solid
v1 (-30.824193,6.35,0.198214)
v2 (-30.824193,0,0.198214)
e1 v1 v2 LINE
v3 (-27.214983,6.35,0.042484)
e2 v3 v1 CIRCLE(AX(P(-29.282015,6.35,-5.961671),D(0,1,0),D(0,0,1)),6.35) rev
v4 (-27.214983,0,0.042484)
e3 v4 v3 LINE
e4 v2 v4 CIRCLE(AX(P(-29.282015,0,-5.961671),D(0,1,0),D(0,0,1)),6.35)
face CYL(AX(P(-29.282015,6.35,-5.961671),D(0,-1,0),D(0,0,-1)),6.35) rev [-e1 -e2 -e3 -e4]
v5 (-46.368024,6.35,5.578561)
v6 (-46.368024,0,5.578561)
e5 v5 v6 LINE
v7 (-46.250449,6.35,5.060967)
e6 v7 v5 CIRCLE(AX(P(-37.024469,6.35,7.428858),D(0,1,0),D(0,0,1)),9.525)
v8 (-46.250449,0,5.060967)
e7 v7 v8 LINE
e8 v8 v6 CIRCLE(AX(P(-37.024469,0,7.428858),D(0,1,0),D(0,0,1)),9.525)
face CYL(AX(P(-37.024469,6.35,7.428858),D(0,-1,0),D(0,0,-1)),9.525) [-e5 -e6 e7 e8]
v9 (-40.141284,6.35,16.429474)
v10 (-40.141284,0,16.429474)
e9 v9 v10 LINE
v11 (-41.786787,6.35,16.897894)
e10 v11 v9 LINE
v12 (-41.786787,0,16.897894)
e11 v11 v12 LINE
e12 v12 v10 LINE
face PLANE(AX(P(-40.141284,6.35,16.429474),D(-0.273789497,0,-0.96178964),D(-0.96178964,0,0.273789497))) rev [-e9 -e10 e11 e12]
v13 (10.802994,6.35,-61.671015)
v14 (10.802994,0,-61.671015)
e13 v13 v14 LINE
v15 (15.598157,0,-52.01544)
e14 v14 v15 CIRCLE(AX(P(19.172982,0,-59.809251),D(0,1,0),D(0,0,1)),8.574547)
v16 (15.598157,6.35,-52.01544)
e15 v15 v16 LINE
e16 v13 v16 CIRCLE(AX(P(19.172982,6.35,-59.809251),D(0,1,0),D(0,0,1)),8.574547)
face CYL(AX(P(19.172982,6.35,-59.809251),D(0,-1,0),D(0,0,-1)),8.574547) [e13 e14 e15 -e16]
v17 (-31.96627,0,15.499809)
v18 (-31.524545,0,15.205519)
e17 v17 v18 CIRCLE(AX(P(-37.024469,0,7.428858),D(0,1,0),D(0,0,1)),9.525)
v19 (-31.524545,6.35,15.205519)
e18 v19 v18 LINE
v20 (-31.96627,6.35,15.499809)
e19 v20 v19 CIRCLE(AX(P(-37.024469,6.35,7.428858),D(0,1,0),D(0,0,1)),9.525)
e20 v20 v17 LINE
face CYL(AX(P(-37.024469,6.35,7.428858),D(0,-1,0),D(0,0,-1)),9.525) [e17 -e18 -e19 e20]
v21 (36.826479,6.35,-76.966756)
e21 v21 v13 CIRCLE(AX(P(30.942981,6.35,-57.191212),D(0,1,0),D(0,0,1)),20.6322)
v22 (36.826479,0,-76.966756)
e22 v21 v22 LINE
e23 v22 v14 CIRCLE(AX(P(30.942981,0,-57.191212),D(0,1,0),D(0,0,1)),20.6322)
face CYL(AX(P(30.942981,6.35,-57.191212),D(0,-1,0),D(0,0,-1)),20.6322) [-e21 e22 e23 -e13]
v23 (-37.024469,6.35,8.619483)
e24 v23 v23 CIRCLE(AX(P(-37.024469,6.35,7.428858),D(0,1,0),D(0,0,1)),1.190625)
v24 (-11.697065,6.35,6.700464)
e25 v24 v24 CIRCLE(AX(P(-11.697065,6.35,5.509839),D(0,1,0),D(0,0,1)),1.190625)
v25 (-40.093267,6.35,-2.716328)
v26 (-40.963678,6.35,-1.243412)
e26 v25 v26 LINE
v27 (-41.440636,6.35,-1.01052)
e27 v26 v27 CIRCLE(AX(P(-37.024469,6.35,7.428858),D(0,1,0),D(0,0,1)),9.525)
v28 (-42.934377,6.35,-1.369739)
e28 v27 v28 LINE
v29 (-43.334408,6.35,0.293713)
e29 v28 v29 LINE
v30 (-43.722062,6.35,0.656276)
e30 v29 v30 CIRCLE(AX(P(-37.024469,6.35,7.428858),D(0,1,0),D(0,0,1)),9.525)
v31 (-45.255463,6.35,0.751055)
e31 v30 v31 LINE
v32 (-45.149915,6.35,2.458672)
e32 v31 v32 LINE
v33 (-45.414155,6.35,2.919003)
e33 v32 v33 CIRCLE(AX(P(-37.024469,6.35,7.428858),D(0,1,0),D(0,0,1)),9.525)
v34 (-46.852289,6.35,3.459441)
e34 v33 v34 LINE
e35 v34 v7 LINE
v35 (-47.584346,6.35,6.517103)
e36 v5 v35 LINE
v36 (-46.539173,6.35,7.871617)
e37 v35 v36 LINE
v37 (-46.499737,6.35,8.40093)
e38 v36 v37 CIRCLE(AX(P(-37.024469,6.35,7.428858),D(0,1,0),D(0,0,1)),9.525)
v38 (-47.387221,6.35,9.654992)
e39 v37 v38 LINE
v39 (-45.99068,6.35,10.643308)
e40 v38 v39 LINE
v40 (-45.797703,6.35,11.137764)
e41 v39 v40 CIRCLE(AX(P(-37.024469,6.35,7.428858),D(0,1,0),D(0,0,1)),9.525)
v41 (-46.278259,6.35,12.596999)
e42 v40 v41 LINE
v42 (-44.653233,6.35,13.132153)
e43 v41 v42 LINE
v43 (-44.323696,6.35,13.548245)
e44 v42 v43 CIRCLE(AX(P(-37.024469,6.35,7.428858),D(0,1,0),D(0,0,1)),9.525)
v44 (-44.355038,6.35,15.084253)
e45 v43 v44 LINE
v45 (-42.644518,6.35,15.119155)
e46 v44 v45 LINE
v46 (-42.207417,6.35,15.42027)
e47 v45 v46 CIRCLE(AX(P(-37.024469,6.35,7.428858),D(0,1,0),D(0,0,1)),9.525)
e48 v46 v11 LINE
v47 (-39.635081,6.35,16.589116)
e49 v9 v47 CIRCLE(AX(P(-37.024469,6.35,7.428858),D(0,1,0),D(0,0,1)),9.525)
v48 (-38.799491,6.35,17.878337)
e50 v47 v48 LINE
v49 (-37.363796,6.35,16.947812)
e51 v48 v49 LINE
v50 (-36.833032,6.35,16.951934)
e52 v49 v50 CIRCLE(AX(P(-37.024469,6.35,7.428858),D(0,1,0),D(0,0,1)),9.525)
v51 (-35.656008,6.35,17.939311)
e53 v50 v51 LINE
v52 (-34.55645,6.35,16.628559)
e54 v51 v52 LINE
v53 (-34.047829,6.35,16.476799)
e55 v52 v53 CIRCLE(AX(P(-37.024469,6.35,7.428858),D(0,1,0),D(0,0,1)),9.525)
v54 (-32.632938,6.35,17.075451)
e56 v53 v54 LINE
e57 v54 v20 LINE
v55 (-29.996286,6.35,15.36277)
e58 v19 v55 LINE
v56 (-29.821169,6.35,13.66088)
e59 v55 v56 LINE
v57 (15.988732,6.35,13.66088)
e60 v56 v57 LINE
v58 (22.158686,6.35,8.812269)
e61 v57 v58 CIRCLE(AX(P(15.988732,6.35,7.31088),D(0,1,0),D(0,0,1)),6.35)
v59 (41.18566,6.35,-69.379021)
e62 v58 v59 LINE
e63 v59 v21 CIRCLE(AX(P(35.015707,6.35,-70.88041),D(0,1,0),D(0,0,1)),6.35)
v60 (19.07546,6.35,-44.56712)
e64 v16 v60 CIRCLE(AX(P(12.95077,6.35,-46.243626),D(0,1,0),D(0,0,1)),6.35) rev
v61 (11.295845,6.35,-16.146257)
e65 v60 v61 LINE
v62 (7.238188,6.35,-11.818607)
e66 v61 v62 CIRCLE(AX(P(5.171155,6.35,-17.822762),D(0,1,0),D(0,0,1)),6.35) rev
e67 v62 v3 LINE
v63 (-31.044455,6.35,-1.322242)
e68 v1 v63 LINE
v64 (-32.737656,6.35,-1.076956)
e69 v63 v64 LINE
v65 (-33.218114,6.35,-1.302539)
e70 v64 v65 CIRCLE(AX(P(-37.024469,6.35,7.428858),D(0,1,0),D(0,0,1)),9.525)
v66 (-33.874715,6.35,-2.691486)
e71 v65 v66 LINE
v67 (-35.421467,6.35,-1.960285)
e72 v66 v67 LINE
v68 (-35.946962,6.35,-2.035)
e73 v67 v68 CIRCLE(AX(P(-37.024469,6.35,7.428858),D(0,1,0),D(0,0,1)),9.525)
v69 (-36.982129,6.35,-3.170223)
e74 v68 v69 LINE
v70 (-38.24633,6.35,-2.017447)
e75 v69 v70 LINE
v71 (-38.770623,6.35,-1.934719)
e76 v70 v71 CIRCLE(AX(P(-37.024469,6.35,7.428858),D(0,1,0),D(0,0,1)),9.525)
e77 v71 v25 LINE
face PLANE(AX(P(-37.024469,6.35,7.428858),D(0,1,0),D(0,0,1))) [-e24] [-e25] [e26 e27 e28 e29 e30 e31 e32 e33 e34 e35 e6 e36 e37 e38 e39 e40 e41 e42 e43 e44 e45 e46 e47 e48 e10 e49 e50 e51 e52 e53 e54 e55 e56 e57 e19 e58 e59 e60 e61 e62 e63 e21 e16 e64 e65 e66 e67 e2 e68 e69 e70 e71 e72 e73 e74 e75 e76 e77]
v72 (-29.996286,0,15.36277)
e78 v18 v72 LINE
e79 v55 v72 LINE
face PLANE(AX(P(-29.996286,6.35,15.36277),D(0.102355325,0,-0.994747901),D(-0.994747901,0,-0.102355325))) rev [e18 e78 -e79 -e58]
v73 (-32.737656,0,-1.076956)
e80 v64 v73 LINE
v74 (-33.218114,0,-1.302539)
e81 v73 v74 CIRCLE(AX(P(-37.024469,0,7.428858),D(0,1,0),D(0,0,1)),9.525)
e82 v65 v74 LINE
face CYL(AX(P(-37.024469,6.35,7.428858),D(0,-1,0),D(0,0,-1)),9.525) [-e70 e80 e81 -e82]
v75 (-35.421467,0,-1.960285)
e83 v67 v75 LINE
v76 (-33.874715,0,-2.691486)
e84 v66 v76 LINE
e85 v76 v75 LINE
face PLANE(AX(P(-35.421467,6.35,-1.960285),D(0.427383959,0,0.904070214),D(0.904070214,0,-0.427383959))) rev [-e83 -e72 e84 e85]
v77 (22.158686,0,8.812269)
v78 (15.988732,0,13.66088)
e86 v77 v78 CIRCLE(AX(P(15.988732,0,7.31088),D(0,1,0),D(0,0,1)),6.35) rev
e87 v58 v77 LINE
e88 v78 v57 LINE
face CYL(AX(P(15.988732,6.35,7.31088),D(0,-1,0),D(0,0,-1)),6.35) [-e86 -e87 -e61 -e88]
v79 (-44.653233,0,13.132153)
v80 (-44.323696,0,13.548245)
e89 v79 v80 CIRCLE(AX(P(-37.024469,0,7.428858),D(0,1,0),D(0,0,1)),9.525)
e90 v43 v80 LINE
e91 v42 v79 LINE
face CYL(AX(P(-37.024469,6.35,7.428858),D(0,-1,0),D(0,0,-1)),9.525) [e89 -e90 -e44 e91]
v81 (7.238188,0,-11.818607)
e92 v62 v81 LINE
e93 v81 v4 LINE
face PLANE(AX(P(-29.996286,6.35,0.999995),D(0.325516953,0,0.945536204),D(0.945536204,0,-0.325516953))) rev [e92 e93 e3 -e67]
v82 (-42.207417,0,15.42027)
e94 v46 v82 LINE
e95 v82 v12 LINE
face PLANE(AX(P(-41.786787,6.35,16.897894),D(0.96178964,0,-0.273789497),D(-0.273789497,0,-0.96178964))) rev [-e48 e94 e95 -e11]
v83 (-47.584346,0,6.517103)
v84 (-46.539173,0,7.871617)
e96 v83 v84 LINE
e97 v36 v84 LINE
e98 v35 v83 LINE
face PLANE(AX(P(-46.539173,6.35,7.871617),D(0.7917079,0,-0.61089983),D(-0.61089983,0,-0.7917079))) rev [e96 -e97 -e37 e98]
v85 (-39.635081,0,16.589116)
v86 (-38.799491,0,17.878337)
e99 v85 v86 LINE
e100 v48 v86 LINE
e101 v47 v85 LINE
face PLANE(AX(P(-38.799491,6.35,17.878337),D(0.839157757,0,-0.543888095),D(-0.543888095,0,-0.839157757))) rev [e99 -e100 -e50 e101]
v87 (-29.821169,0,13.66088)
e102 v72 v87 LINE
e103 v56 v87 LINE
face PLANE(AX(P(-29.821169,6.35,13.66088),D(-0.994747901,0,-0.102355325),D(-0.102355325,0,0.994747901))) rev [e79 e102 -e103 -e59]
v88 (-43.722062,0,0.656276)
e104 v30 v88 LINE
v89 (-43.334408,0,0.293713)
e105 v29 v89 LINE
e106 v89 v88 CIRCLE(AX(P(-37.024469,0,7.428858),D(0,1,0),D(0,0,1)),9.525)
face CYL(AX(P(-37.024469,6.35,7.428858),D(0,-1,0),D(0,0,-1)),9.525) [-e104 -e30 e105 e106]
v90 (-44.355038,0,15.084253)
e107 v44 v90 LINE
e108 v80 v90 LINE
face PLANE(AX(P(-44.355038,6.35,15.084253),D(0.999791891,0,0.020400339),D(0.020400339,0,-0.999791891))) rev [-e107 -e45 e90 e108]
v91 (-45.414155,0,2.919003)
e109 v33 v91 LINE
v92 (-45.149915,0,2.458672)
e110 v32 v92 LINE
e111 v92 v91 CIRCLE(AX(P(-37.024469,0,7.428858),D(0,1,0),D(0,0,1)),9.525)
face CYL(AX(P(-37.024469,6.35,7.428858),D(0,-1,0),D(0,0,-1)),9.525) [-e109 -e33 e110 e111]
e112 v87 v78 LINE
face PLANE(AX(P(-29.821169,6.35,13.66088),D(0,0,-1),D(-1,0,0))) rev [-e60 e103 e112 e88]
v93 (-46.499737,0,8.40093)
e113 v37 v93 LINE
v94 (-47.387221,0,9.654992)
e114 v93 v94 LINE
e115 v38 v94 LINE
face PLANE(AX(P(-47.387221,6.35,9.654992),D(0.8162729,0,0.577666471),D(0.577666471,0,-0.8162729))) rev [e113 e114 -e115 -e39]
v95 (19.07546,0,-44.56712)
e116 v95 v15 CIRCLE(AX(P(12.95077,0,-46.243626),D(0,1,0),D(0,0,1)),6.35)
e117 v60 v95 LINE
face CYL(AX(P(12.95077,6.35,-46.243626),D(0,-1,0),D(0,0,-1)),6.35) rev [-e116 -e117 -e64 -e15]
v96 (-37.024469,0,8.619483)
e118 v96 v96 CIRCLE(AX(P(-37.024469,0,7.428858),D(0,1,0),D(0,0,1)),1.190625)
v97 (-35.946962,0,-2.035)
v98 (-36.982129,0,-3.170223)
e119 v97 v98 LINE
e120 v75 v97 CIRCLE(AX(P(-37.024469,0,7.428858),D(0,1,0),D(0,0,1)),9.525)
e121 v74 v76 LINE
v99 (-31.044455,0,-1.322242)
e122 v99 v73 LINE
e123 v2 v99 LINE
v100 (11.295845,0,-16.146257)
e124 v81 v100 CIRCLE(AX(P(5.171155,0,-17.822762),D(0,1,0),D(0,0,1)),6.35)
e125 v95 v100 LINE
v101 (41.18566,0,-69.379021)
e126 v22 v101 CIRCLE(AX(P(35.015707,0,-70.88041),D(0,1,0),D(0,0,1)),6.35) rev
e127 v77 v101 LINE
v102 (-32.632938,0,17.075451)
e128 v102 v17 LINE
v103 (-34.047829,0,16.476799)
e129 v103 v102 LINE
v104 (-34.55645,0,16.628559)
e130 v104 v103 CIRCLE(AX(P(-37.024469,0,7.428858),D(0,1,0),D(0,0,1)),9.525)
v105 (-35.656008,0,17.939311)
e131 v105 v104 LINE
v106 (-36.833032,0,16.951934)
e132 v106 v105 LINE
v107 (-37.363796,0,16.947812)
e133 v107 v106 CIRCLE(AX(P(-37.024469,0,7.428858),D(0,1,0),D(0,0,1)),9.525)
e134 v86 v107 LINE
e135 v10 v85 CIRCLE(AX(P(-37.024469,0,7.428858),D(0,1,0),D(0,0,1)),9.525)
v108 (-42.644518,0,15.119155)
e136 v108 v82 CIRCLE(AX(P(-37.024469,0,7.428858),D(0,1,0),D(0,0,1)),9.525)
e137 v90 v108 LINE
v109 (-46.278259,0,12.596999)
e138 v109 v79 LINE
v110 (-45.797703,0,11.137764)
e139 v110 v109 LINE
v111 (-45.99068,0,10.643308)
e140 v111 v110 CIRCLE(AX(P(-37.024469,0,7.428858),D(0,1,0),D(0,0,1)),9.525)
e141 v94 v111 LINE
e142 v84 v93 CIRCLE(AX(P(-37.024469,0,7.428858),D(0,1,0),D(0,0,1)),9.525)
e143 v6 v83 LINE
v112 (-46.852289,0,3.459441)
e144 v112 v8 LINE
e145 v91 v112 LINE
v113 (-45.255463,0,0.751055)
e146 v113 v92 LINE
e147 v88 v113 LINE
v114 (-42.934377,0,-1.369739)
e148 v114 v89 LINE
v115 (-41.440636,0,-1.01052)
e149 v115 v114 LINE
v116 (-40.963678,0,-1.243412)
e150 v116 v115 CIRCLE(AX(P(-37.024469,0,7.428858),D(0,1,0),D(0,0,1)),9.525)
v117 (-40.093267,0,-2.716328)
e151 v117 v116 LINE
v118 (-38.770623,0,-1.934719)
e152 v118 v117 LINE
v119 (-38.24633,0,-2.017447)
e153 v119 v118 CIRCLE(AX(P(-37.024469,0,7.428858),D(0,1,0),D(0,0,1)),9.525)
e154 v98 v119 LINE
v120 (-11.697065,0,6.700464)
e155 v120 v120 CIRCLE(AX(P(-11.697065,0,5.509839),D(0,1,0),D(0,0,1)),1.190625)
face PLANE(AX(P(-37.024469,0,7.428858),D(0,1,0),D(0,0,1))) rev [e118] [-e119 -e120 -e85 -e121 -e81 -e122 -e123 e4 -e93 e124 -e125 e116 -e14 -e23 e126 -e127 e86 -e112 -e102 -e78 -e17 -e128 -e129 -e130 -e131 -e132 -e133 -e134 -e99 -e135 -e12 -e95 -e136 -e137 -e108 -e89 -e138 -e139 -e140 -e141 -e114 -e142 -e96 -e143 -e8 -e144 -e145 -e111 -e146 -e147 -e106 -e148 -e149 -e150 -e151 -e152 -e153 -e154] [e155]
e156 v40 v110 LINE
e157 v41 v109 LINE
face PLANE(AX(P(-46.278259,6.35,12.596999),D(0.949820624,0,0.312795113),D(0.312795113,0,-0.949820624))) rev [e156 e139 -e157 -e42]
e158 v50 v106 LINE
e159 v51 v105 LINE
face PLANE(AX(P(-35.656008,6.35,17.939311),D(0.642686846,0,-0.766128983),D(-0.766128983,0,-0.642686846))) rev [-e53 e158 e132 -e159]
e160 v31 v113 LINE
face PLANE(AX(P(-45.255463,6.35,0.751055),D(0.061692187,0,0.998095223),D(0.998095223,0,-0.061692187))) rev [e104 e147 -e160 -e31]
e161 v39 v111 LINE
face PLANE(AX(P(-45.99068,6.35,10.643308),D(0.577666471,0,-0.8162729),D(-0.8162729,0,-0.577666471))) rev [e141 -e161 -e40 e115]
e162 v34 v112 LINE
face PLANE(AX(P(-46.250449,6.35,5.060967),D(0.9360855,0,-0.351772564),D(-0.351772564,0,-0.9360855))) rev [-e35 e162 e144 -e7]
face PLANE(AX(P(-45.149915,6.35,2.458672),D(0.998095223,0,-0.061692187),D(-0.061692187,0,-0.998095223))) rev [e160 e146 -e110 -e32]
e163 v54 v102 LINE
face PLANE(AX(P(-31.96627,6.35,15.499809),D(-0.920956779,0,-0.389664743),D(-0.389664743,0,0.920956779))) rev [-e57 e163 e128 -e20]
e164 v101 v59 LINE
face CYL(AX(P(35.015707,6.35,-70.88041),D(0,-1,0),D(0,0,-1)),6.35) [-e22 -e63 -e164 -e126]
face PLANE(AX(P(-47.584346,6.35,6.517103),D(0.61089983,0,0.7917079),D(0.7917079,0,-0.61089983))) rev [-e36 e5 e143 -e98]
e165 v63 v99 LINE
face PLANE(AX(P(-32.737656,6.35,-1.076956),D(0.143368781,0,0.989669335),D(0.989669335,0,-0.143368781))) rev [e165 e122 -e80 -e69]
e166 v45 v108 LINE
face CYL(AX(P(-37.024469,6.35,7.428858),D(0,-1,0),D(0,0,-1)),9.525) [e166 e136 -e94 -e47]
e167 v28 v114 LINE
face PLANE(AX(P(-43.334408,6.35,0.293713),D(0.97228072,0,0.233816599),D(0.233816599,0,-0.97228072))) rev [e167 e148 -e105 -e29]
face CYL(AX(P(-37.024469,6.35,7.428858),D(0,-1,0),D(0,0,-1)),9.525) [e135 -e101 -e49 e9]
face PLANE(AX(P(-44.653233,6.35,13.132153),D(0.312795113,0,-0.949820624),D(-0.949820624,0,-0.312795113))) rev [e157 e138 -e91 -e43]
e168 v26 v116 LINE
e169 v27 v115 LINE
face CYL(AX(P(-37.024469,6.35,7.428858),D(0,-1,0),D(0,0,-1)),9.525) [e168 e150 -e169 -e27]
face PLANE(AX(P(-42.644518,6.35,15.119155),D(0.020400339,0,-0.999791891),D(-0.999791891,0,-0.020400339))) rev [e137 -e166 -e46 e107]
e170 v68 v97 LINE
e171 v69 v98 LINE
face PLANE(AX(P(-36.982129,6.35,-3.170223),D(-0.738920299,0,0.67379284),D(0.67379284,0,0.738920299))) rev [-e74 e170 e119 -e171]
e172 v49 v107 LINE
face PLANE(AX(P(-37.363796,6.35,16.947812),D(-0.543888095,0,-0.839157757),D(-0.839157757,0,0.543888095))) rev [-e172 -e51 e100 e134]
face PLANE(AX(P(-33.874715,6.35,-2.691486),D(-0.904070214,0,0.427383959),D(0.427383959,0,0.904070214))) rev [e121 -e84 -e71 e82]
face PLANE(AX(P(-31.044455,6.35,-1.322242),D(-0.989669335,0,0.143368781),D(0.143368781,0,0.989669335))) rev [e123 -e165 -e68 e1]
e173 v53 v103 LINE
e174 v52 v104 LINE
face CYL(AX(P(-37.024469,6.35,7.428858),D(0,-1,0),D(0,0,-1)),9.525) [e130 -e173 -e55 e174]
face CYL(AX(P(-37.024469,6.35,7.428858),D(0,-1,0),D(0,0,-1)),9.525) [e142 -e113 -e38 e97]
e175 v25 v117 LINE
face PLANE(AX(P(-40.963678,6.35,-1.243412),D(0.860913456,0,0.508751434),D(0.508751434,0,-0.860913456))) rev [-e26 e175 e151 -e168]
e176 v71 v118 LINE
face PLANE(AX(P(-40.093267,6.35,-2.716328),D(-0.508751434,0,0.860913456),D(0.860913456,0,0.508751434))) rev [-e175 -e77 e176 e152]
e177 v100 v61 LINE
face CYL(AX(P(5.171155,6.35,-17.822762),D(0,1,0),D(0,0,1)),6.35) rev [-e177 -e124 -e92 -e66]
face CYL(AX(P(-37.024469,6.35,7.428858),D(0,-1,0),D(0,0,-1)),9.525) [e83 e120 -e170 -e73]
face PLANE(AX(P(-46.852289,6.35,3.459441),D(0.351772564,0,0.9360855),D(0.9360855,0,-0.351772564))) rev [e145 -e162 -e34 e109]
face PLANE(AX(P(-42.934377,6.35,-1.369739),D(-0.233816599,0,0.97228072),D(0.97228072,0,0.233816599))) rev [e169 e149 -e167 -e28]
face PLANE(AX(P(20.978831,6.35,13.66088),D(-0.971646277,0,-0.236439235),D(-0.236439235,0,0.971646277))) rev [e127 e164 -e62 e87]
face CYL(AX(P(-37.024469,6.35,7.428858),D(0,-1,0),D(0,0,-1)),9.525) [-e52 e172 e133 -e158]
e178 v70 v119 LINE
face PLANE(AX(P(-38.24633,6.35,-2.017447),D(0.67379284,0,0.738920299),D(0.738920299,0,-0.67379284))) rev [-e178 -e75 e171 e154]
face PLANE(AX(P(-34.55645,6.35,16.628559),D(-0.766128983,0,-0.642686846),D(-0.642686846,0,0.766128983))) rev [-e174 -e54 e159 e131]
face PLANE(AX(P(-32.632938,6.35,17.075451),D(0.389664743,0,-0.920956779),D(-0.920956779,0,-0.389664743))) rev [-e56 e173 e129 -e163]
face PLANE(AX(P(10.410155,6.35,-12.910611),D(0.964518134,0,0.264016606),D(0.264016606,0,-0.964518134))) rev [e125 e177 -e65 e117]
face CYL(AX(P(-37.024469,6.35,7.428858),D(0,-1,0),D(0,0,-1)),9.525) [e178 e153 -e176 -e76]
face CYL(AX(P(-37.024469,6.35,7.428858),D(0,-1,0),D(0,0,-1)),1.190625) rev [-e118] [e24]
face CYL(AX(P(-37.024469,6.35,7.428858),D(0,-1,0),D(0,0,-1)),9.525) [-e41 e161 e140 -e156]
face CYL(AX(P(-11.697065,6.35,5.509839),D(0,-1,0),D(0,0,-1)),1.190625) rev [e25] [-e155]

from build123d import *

# Parameters (mm, degrees)
SKETCH1_R           = 1.190625
BOSS_EXTRUDE1_DEPTH = 6.35
FILLET1_R           = 6.35


with BuildPart() as part:
    # Sketch1 → Boss-Extrude1 (new body)
    with BuildSketch(Plane(origin=(0, 0, 0), x_dir=(1, 0, 0), z_dir=(0, 1, 0))):
        with BuildLine():
            Line((-29.821169202, -13.660880054), (20.978830798, -13.660880054))
            Line((20.978830798, -13.660880054), (42.395952597, 74.352713283))
            ThreePointArc((42.395952597, 74.352713283), (23.25712174, 76.338412105), (10.802994012, 61.671014622))
            ThreePointArc((10.802994012, 61.671014622), (13.079862123, 53.776279051), (20.951622371, 51.421206075))
            Line((20.951622371, 51.421206075), (10.410154917, 12.910611329))
            Line((10.410154917, 12.910611329), (-29.996286473, -0.999994782))
            ThreePointArc((-29.996286473, -0.999994782), (-30.398101975, -0.586570963), (-30.824193291, -0.198213985))
            Line((-30.824193291, -0.198213985), (-31.044454647, 1.322241923))
            Line((-31.044454647, 1.322241923), (-32.73765618, 1.076955714))
            ThreePointArc((-32.73765618, 1.076955714), (-32.976313311, 1.193094592), (-33.218113701, 1.302538808))
            Line((-33.218113701, 1.302538808), (-33.874715297, 2.691486458))
            Line((-33.874715297, 2.691486458), (-35.421467347, 1.960285492))
            ThreePointArc((-35.421467347, 1.960285492), (-35.683694268, 2.001303864), (-35.946962256, 2.035000026))
            Line((-35.946962256, 2.035000026), (-36.982128516, 3.170223372))
            Line((-36.982128516, 3.170223372), (-38.246329537, 2.017447359))
            ThreePointArc((-38.246329537, 2.017447359), (-38.509052422, 1.979735943), (-38.770622576, 1.934719064))
            Line((-38.770622576, 1.934719064), (-40.093267325, 2.716327725))
            Line((-40.093267325, 2.716327725), (-40.963677954, 1.243411538))
            ThreePointArc((-40.963677954, 1.243411538), (-41.203779335, 1.130288631), (-41.440635618, 1.010519829))
            Line((-41.440635618, 1.010519829), (-42.934376923, 1.369738627))
            Line((-42.934376923, 1.369738627), (-43.334408136, -0.293713141))
            ThreePointArc((-43.334408136, -0.293713141), (-43.530761052, -0.472293647), (-43.722062046, -0.656275697))
            Line((-43.722062046, -0.656275697), (-45.255462875, -0.751055081))
            Line((-45.255462875, -0.751055081), (-45.149915191, -2.458672264))
            ThreePointArc((-45.149915191, -2.458672264), (-45.285242191, -2.686996744), (-45.414154972, -2.919003123))
            Line((-45.414154972, -2.919003123), (-46.852288576, -3.459440878))
            Line((-46.852288576, -3.459440878), (-46.250449331, -5.060967113))
            ThreePointArc((-46.250449331, -5.060967113), (-46.312842744, -5.318944878), (-46.368024039, -5.57856092))
            Line((-46.368024039, -5.57856092), (-47.58434641, -6.517102938))
            Line((-47.58434641, -6.517102938), (-46.539172541, -7.871616999))
            ThreePointArc((-46.539172541, -7.871616999), (-46.523142255, -8.136548112), (-46.499736562, -8.400929727))
            Line((-46.499736562, -8.400929727), (-47.387221268, -9.654991978))
            Line((-47.387221268, -9.654991978), (-45.990679537, -10.643307692))
            ThreePointArc((-45.990679537, -10.643307692), (-45.897636087, -10.89188038), (-45.797702915, -11.137764145))
            Line((-45.797702915, -11.137764145), (-46.278258552, -12.596999395))
            Line((-46.278258552, -12.596999395), (-44.653233223, -13.132153052))
            ThreePointArc((-44.653233223, -13.132153052), (-44.491363673, -13.34249495), (-44.323696325, -13.548245102))
            Line((-44.323696325, -13.548245102), (-44.355037921, -15.084252569))
            Line((-44.355037921, -15.084252569), (-42.644517948, -15.11915502))
            ThreePointArc((-42.644517948, -15.11915502), (-42.428065496, -15.272757758), (-42.207417329, -15.420269965))
            Line((-42.207417329, -15.420269965), (-41.78678708, -16.897893539))
            Line((-41.78678708, -16.897893539), (-40.141284249, -16.429473653))
            ThreePointArc((-40.141284249, -16.429473653), (-39.889294943, -16.512821445), (-39.635081193, -16.589115838))
            Line((-39.635081193, -16.589115838), (-38.799491125, -17.878336715))
            Line((-38.799491125, -17.878336715), (-37.363796242, -16.947811616))
            ThreePointArc((-37.363796242, -16.947811616), (-37.098443082, -16.953570537), (-36.833032482, -16.951933832))
            Line((-36.833032482, -16.951933832), (-35.656007696, -17.939311107))
            Line((-35.656007696, -17.939311107), (-34.556450183, -16.628559402))
            ThreePointArc((-34.556450183, -16.628559402), (-34.301082079, -16.556222714), (-34.047828595, -16.476798928))
            Line((-34.047828595, -16.476798928), (-32.632937655, -17.075451466))
            Line((-32.632937655, -17.075451466), (-31.966269592, -15.499808597))
            ThreePointArc((-31.966269592, -15.499808597), (-31.743356851, -15.355741339), (-31.52454472, -15.205519116))
            Line((-31.52454472, -15.205519116), (-29.996286473, -15.362770384))
            Line((-29.996286473, -15.362770384), (-29.821169202, -13.660880054))
        make_face()
        with Locations(Location((-37.024468694, -7.428857796, 0), (0, 0, 270))):
            Circle(SKETCH1_R, mode=Mode.SUBTRACT)
        with Locations(Location((-11.697065196, -5.509839295, 0), (0, 0, 270))):
            Circle(SKETCH1_R, mode=Mode.SUBTRACT)
    extrude(amount=BOSS_EXTRUDE1_DEPTH)

    # Fillet1
    # the kernel refuses this fillet: 6.35 mm, written as the material it adds along each edge
    with BuildSketch(Plane(origin=(-29.996286473, 0, 0.999994782), x_dir=(0.9455362039998026, 0, -0.3255169533613324), z_dir=(0, 1, 0))) as fillet1_piece_1:
        with BuildLine():
            CenterArc((2.941509547, 6.35), FILLET1_R, 236.94754351, 33.05245649)
            ThreePointArc((-0.521822628, 1.027610476), (-0.245354643, 0.521704946), (0, 0))
            Line((0, 0), (2.941509547, 0))
        make_face()
    extrude(amount=6.35)
    with BuildSketch(Plane(origin=(10.410154917, 0, -12.910611329), x_dir=(0.2640166060846216, 0, -0.9645181344648517), z_dir=(0, 1, 0))) as fillet1_piece_2:
        with BuildLine():
            CenterArc((FILLET1_R * 0.528295396262, FILLET1_R), FILLET1_R, 214.305424952, 55.694575048)
            Line((-FILLET1_R * 0.297749538039, FILLET1_R * 0.436395735897), (0, 0))
            Line((0, 0), (FILLET1_R * 0.528295396262, 0))
        make_face()
    extrude(amount=6.35)
    with BuildSketch(Plane(origin=(20.951622371, 0, -51.421206075), x_dir=(-0.9938958560926382, 0, -0.11032237869934564), z_dir=(0, 1, 0))) as fillet1_piece_3:
        with BuildLine():
            CenterArc((7.380811015, 6.028648653), FILLET1_R, 171.02537205, 80.668791662)
            Line((1.108550782, 7.019230085), (0, 0))
            ThreePointArc((0, 0), (2.693172408, 0.433927926), (5.386344816, 0))
        make_face()
    extrude(amount=6.35)
    # the kernel refuses this fillet: 6.35 mm, written as the material it takes off along each edge
    with BuildSketch(Plane(origin=(20.978830798, -12.475246836, 13.660880054), x_dir=(-1, 0, 0), z_dir=(0, 1, 0))) as fillet1_2_piece_1:
        with BuildLine():
            CenterArc((FILLET1_R * 0.785842320361, -FILLET1_R), FILLET1_R, 90, 76.323524065)
            Line((-FILLET1_R * 0.185803956952, -FILLET1_R * 0.763560765133), (0, 0))
            Line((0, 0), (FILLET1_R * 0.785842320361, 0))
        make_face()
    extrude(amount=31.300493671, mode=Mode.SUBTRACT)
    with BuildSketch(Plane(origin=(42.395952597, -15.381047636, -74.352713283), x_dir=(-0.23643923486666696, 0, 0.9716462773127189), z_dir=(0, 1, 0))) as fillet1_2_piece_2:
        with BuildLine():
            CenterArc((5.118829866, -6.35), FILLET1_R, 90, 87.108005414)
            ThreePointArc((-1.223082878, -6.029620925), (-0.837554928, -2.968964591), (0, 0))
            Line((0, 0), (5.118829866, 0))
        make_face()
    extrude(amount=37.112095273, mode=Mode.SUBTRACT)


solid = part.part
